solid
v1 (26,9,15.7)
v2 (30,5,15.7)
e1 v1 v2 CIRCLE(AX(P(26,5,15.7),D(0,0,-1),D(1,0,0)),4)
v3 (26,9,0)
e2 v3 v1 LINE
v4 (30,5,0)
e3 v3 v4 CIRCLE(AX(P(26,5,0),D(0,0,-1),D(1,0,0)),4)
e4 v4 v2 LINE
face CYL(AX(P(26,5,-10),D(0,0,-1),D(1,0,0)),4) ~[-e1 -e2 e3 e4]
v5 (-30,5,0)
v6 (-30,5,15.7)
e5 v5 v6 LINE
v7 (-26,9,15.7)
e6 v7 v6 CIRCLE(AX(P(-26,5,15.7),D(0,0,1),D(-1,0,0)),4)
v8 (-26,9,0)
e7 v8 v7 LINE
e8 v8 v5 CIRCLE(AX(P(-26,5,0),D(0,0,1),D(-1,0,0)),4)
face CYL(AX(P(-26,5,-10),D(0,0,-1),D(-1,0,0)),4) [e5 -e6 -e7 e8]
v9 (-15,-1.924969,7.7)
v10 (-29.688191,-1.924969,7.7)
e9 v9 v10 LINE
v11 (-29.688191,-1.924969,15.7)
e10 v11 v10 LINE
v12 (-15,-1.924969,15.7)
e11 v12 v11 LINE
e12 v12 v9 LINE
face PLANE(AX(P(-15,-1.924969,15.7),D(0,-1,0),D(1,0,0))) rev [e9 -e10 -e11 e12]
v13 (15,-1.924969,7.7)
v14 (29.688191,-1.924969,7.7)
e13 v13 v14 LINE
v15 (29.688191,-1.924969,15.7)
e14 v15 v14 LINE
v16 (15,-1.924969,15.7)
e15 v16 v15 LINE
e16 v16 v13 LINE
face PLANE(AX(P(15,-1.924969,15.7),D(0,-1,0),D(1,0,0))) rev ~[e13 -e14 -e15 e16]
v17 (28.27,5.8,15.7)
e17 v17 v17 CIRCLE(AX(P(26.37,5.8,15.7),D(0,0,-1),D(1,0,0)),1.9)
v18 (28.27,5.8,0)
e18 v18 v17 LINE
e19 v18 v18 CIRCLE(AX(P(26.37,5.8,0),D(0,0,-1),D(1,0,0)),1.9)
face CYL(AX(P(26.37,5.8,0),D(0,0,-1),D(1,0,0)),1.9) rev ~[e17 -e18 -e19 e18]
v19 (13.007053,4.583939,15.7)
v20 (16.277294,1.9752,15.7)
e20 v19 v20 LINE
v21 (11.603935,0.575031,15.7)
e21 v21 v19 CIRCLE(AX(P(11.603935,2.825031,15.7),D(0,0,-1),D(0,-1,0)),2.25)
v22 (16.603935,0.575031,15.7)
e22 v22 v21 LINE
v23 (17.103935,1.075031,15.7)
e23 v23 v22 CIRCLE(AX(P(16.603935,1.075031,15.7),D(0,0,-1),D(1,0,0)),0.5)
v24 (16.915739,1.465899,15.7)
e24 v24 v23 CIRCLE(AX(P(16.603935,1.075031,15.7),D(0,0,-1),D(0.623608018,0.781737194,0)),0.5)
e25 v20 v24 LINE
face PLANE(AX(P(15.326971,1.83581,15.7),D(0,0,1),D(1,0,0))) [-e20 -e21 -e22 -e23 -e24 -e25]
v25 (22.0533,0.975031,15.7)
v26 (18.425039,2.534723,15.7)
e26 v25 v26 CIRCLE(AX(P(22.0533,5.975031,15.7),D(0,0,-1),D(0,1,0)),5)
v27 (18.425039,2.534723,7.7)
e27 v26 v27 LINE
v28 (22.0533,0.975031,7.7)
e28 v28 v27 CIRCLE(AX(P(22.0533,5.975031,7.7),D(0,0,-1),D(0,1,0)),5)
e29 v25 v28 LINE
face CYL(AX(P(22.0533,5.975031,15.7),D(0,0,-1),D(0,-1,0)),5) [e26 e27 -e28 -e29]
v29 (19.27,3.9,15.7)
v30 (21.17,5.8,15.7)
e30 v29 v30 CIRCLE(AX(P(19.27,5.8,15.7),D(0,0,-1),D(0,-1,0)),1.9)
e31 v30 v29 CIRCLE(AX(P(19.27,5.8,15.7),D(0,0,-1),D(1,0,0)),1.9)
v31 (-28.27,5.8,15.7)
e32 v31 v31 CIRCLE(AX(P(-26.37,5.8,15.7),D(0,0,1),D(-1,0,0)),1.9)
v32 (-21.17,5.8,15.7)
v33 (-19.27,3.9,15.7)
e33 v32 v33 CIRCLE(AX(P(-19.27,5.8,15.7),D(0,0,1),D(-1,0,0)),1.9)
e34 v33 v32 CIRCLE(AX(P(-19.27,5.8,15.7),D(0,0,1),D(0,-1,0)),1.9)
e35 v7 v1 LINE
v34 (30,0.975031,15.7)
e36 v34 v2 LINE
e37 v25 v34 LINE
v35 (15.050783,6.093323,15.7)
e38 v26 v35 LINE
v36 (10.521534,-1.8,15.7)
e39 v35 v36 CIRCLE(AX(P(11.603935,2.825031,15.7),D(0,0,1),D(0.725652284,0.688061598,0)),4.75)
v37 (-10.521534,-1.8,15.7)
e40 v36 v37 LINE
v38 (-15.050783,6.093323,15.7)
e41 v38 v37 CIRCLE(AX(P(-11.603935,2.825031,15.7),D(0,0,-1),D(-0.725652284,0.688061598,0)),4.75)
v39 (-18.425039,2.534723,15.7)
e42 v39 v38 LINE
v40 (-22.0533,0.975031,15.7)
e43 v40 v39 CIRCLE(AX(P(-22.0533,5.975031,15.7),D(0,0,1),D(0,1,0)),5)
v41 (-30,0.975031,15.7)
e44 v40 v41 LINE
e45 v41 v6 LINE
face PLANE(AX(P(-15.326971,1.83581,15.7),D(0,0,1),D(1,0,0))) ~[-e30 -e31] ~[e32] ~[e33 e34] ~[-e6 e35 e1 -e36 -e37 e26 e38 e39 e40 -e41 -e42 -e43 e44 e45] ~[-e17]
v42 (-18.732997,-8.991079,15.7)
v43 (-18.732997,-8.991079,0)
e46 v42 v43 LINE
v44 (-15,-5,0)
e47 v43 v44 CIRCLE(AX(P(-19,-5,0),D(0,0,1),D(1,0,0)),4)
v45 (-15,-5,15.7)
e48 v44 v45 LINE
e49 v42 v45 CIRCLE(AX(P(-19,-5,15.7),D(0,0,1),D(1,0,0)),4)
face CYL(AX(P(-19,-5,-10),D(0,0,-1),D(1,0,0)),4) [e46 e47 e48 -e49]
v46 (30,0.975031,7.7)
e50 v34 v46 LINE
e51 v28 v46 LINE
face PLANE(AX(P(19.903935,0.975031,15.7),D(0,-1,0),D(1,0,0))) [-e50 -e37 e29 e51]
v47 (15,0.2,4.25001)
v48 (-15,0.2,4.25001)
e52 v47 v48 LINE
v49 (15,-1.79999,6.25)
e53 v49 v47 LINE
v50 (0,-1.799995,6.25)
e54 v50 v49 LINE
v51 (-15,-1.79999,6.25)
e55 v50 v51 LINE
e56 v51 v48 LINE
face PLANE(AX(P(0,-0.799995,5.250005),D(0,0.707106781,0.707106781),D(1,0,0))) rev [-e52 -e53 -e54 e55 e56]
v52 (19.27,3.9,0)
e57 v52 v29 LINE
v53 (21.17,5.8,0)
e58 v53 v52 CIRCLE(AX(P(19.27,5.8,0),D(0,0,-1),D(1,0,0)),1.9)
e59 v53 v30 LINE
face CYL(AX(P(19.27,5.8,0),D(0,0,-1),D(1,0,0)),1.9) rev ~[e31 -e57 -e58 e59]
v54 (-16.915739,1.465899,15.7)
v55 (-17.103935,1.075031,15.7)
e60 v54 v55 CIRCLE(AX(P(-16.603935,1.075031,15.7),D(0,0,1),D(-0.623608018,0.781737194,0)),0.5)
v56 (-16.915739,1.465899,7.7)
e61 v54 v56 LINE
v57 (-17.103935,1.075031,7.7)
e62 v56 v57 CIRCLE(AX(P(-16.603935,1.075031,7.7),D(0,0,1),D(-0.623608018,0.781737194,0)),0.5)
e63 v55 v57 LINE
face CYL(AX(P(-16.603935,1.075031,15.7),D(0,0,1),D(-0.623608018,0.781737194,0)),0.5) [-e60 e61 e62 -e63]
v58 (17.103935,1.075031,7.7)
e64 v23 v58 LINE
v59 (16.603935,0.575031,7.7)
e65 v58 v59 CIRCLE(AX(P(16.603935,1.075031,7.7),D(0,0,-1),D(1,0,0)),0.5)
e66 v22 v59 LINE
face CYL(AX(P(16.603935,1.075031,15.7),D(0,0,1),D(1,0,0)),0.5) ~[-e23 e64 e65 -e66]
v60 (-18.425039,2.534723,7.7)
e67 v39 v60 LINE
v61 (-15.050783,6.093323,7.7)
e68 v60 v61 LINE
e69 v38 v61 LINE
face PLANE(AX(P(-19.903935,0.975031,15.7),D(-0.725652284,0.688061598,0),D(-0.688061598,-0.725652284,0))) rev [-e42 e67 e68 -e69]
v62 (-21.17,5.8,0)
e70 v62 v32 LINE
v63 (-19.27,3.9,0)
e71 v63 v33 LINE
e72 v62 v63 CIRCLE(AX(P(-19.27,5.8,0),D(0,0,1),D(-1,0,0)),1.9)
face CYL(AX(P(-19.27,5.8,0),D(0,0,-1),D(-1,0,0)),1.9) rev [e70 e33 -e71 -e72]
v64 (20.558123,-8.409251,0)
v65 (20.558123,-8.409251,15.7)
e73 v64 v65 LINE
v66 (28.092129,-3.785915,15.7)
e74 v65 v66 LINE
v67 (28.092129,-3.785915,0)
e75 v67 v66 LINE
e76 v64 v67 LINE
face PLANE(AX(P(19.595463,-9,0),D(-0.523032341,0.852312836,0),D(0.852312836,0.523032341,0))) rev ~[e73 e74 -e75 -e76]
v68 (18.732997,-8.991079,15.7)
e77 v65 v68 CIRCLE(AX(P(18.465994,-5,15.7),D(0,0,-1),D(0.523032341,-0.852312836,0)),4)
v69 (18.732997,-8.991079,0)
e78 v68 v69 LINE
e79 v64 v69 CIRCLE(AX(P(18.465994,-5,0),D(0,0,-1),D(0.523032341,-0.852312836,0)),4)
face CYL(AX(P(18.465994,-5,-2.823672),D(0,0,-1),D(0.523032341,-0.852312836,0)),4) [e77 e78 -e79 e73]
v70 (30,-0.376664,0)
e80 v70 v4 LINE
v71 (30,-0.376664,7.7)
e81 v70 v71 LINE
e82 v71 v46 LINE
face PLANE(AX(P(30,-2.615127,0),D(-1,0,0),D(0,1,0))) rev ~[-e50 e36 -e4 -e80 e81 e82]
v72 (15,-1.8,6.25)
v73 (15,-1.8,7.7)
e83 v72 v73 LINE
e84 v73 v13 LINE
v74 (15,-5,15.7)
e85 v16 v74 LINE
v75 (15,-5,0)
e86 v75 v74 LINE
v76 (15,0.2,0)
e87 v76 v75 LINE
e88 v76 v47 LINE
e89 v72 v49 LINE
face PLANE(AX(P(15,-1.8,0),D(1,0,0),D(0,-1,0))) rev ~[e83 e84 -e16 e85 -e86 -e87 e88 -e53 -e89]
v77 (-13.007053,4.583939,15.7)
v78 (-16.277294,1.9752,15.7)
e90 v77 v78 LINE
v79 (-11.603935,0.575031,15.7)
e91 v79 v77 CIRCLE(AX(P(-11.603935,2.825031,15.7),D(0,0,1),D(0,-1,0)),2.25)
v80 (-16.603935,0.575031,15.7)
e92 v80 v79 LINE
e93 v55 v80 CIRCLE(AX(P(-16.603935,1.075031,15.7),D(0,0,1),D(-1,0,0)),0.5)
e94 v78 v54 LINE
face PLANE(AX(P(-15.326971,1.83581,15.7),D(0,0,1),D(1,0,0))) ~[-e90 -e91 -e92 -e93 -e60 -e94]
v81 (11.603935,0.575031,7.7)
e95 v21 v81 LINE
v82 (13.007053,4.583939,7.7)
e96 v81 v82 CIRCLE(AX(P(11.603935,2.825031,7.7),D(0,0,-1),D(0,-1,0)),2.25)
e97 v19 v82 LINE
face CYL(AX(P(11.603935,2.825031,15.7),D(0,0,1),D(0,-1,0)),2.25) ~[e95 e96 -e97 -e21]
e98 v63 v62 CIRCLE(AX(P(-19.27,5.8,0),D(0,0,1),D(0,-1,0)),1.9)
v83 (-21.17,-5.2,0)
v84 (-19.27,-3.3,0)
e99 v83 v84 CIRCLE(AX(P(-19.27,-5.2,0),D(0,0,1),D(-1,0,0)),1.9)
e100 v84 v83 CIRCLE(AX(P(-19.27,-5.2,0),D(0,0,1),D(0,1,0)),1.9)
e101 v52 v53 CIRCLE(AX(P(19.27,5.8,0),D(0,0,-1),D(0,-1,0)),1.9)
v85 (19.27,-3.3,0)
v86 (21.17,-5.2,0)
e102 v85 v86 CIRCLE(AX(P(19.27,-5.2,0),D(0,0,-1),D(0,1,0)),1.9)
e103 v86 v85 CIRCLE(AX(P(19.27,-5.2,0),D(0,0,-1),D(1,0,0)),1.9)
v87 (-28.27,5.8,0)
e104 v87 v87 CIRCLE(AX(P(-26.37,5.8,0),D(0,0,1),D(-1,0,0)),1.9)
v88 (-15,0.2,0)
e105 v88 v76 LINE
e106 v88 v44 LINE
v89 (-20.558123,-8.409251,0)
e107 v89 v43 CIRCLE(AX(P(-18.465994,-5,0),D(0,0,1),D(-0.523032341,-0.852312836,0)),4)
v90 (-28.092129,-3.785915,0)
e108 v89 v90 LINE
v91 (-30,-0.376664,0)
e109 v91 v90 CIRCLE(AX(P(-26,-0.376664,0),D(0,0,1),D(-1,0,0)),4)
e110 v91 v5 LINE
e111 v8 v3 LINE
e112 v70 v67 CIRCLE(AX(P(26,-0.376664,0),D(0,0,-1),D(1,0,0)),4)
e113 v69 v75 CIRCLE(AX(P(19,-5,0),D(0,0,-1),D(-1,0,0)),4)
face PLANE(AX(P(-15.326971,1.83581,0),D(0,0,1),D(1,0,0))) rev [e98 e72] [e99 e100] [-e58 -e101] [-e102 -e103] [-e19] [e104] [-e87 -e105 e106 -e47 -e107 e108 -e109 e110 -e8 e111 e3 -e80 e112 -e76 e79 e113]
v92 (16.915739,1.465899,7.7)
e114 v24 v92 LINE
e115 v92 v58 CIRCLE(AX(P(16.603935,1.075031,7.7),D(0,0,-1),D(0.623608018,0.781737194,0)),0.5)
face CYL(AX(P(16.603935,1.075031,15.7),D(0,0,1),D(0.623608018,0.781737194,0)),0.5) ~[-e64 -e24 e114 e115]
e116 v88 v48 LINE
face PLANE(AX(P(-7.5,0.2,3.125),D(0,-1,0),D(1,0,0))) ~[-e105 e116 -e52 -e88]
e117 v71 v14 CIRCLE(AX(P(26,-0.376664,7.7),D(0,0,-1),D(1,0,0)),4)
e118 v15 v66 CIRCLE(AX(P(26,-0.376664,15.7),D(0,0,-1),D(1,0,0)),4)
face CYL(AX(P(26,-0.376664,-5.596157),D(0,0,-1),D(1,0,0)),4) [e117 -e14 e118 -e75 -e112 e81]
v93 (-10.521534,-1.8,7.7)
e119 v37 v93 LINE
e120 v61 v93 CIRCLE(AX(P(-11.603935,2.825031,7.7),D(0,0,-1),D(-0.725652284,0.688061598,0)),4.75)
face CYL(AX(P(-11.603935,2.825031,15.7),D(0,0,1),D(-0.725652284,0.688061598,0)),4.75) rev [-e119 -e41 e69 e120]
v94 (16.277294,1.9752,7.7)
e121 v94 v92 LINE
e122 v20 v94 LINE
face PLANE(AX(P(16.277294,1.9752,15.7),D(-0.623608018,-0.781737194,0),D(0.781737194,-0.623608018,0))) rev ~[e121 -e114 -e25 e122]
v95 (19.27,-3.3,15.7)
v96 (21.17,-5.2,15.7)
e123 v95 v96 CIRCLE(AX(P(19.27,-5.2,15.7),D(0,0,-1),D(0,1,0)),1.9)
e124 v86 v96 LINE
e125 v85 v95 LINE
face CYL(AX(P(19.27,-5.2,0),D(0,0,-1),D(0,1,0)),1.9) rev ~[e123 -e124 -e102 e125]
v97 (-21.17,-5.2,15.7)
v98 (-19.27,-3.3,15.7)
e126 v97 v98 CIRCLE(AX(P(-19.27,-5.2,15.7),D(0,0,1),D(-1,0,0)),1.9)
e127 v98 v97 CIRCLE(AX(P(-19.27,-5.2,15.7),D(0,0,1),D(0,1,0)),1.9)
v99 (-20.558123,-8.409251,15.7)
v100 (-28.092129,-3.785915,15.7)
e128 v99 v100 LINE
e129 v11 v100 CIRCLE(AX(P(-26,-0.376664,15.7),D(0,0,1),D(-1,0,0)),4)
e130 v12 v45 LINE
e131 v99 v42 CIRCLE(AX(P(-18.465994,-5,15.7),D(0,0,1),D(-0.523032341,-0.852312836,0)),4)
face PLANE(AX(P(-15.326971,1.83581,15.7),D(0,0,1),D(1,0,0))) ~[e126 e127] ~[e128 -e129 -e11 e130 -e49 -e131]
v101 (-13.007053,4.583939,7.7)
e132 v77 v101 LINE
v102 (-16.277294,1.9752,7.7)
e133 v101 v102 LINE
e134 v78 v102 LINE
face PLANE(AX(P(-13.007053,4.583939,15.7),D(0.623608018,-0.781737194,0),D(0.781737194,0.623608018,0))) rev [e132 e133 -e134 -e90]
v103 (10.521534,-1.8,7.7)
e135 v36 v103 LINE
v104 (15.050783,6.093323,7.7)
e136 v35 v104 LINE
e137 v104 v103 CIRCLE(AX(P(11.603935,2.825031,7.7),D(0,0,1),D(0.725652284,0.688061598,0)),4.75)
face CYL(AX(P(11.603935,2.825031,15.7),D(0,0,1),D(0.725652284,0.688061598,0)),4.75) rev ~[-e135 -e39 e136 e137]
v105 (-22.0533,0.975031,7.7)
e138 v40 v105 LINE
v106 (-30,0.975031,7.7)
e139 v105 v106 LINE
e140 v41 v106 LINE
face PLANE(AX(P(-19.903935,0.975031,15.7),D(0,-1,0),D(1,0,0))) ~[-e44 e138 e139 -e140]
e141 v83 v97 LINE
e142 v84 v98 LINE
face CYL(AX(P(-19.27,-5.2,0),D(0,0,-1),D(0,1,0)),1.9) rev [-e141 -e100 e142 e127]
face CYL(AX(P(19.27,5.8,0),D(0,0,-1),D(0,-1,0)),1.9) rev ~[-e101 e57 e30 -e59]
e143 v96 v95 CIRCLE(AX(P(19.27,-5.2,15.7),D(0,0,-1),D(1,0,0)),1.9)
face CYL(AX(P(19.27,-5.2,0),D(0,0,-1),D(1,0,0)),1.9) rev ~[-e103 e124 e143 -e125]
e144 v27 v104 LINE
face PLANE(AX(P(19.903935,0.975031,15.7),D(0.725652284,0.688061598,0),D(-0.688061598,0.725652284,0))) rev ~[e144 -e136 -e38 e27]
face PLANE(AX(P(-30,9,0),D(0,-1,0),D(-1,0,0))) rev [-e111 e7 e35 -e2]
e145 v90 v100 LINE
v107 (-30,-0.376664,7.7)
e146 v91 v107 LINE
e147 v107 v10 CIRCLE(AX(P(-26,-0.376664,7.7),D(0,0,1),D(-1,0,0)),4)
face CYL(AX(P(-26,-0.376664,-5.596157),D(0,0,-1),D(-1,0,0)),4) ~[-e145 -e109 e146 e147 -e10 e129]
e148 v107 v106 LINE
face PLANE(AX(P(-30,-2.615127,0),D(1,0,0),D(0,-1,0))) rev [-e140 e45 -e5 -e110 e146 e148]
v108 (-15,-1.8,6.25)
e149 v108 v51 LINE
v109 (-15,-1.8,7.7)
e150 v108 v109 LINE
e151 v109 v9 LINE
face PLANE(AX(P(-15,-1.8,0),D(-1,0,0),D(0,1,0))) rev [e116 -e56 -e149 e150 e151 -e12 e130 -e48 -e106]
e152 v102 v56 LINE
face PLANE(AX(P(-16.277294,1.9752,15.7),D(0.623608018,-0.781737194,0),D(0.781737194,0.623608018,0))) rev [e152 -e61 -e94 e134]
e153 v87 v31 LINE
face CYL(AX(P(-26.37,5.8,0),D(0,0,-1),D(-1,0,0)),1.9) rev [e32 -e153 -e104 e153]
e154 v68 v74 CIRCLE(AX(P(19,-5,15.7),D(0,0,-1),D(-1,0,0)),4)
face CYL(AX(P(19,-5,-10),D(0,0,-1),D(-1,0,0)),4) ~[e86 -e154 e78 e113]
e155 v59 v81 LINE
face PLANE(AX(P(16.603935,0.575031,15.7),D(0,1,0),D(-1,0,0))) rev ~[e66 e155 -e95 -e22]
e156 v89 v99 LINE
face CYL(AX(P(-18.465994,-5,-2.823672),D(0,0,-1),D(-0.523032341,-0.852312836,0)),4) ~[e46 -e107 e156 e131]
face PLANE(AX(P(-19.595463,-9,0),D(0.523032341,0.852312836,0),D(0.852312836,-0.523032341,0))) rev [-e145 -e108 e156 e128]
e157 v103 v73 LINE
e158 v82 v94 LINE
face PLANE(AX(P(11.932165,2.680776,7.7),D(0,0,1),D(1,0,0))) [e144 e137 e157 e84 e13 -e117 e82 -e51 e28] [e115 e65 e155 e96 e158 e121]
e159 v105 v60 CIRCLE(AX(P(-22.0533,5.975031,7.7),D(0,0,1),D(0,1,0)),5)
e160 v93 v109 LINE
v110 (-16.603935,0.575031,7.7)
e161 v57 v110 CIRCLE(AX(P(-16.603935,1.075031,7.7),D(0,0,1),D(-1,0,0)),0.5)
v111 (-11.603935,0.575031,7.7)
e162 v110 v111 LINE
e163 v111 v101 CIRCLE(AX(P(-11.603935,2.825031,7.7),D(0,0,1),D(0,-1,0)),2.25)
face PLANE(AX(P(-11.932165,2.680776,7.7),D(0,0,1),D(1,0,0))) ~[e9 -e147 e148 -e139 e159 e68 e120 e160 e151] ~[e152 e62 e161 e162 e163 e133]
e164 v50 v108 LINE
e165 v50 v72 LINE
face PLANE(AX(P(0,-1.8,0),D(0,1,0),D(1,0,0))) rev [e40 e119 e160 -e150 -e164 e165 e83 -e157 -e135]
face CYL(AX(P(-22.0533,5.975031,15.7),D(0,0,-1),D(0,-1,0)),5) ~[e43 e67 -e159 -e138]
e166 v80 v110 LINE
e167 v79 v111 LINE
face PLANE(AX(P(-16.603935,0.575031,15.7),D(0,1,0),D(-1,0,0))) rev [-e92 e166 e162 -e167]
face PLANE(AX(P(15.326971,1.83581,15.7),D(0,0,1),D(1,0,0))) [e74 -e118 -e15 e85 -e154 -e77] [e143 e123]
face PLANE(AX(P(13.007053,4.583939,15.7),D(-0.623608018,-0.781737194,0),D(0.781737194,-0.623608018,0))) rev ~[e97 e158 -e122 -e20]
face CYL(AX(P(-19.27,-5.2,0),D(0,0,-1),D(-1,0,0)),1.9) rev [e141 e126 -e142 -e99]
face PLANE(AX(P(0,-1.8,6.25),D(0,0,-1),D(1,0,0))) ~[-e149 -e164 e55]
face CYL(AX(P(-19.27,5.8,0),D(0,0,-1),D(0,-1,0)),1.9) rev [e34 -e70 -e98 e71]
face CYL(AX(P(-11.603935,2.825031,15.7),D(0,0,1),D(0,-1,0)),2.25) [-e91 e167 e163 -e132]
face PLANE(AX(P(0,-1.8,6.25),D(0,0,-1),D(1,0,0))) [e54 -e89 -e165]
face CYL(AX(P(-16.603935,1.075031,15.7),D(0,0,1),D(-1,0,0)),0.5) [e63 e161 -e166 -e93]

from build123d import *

# Parameters (mm, degrees)
F1_DEPTH    = 15.7
F2_W        = 10.0960650777
F2_H        = 2.9
F3_DEPTH    = 8
F4_R        = 5
F5_T1_DEPTH = 26.8923143391
F5_T3_DEPTH = 21.3473434867
F5_T5_DEPTH = 35.7
F6_W        = 15
F6_H        = 6.25
F7_DEPTH    = 2
F8_SIZE     = 1.99999


# Not quite as in the source:
# - a fillet or chamfer that OpenCascade refuses, or shapes differently, is made with other operations: its cross-section is extruded or revolved along the edge and cut away or added
# - a fillet or chamfer is up to 0.001 mm smaller than in the source, because OpenCascade refuses the exact size


with BuildPart() as f1:
    # F0 (on Top) → F1 (new body)
    with BuildSketch(Plane.XY):
        Polygon((30, 9), (0, 9), (0, -1.8), (15, -1.8), (15, -9), (19.5954625243, -9), (30, -2.6151265483), align=None)
        with BuildLine():
            ThreePointArc((21.17, -5.2), (17.9264971157, -6.5435028843), (19.27, -3.3))
            ThreePointArc((19.27, -3.3), (20.6135028843, -3.8564971157), (21.17, -5.2))
        make_face(mode=Mode.SUBTRACT)
        with BuildLine():
            ThreePointArc((19.27, 3.9), (17.9264971157, 7.1435028843), (21.17, 5.8))
            ThreePointArc((21.17, 5.8), (20.6135028843, 4.4564971157), (19.27, 3.9))
        make_face(mode=Mode.SUBTRACT)
        with BuildLine():
            ThreePointArc((24.47, 5.8), (26.37, 7.7), (28.27, 5.8))
            ThreePointArc((28.27, 5.8), (26.37, 3.9), (24.47, 5.8))
        make_face(mode=Mode.SUBTRACT)
    extrude(amount=F1_DEPTH)

    # F2 (on face) → F3 (cut)
    with BuildSketch(Plane.XY.offset(15.7)):
        with BuildLine():
            ThreePointArc((11.6039349223, 0.5750306588), (9.4802536205, 3.5683191144), (13.0070529624, 4.5839393448))
            Line((13.0070529624, 4.5839393448), (16.2772942688, 1.9751998411))
            ThreePointArc((16.2772942688, 1.9751998411), (16.3347359589, 2.3983908199), (16.3539349223, 2.8250306588))
            ThreePointArc((16.3539349223, 2.8250306588), (16.0161356009, 4.5842876531), (15.050783271, 6.09332325))
            ThreePointArc((15.050783271, 6.09332325), (7.4840088208, 5.1890756918), (10.5215341623, -1.8))
            Line((10.5215341623, -1.8), (12.6863356823, -1.8))
            ThreePointArc((12.6863356823, -1.8), (14.4922032842, -0.9459646832), (15.787235055, 0.5750306588))
            Line((15.787235055, 0.5750306588), (11.6039349223, 0.5750306588))
        make_face()
        with BuildLine():
            ThreePointArc((16.3539349223, 2.8250306588), (16.3347359589, 2.3983908199), (16.2772942688, 1.9751998411))
            Line((16.2772942688, 1.9751998411), (16.9157389312, 1.4658992557))
            ThreePointArc((16.9157389312, 1.4658992557), (17.0544357572, 1.2919384682), (17.1039349223, 1.0750306588))
            ThreePointArc((17.1039349223, 1.0750306588), (16.9574883129, 0.7214772682), (16.6039349223, 0.5750306588))
            Line((16.6039349223, 0.5750306588), (15.787235055, 0.5750306588))
            ThreePointArc((15.787235055, 0.5750306588), (14.4922032842, -0.9459646832), (12.6863356823, -1.8))
            Line((12.6863356823, -1.8), (15, -1.8))
            Line((15, -1.8), (15, -1.9249693412))
            Line((15, -1.9249693412), (19.9039349223, -1.9249693412))
            Line((19.9039349223, -1.9249693412), (19.9039349223, 0.9750306588))
            Line((19.9039349223, 0.9750306588), (15.050783271, 6.09332325))
            ThreePointArc((15.050783271, 6.09332325), (16.0161356009, 4.5842876531), (16.3539349223, 2.8250306588))
        make_face()
        with Locations((24.9519674612, -0.4749693412)):
            Rectangle(F2_W, F2_H)
    extrude(amount=-F3_DEPTH, mode=Mode.SUBTRACT)

    # F4
    f4_edges = [f1.edges().sort_by_distance(p)[0] for p in [
        (19.903935, 0.975031, 11.7),
    ]]
    fillet(f4_edges, radius=F4_R)

    # F5: fillet of radius 4 on 4 edges, made by hand

    # F5_s2 → F5_t1 (cut)
    with BuildSketch(Plane.XY.offset(-5.5961571696)):
        with BuildLine():
            ThreePointArc((30, -0.3766636805), (29.4905957559, -2.3300559271), (28.0921293656, -3.7859150232))
            Line((28.0921293656, -3.7859150232), (30, -2.6151265483))
            Line((30, -2.6151265483), (30, -0.3766636805))
        make_face()
    extrude(amount=F5_T1_DEPTH, mode=Mode.SUBTRACT)

    # F5_s4 → F5_t3 (cut)
    with BuildSketch(Plane.XY.offset(-2.8236717433)):
        with BuildLine():
            ThreePointArc((20.5581231925, -8.4092513427), (19.5529608525, -8.8494808332), (18.465993827, -9))
            Line((18.465993827, -9), (19.5954625243, -9))
            Line((19.5954625243, -9), (20.5581231925, -8.4092513427))
        make_face()
    extrude(amount=F5_T3_DEPTH, mode=Mode.SUBTRACT)

    # F5_s6 → F5_t5 (cut)
    with BuildSketch(Plane.XY.offset(-10)):
        with BuildLine():
            ThreePointArc((15, -5), (16.1715728753, -7.8284271247), (19, -9))
            Line((19, -9), (15, -9))
            Line((15, -9), (15, -5))
        make_face()
        with BuildLine():
            ThreePointArc((30, 5), (28.8284271247, 7.8284271247), (26, 9))
            Line((26, 9), (30, 9))
            Line((30, 9), (30, 5))
        make_face()
    extrude(amount=F5_T5_DEPTH, mode=Mode.SUBTRACT)

    # F6 (on face) → F7 (cut)
    with BuildSketch(Plane.XZ.offset(1.8)):
        with Locations((7.5, 3.125)):
            Rectangle(F6_W, F6_H)
    extrude(amount=-F7_DEPTH, mode=Mode.SUBTRACT)

    # F8 (size 2 in the source; OpenCascade refuses exactly that, so slightly less here)
    f8_edges = [f1.edges().sort_by_distance(p)[0] for p in [
        (7.5, 0.2, 6.25),
    ]]
    chamfer(f8_edges, length=F8_SIZE)

    # F9: F1 across plane


with BuildPart() as f1_1:
    add(f1.part)
    add(f1.part.mirror(Plane.YZ))


solid = f1_1.part
